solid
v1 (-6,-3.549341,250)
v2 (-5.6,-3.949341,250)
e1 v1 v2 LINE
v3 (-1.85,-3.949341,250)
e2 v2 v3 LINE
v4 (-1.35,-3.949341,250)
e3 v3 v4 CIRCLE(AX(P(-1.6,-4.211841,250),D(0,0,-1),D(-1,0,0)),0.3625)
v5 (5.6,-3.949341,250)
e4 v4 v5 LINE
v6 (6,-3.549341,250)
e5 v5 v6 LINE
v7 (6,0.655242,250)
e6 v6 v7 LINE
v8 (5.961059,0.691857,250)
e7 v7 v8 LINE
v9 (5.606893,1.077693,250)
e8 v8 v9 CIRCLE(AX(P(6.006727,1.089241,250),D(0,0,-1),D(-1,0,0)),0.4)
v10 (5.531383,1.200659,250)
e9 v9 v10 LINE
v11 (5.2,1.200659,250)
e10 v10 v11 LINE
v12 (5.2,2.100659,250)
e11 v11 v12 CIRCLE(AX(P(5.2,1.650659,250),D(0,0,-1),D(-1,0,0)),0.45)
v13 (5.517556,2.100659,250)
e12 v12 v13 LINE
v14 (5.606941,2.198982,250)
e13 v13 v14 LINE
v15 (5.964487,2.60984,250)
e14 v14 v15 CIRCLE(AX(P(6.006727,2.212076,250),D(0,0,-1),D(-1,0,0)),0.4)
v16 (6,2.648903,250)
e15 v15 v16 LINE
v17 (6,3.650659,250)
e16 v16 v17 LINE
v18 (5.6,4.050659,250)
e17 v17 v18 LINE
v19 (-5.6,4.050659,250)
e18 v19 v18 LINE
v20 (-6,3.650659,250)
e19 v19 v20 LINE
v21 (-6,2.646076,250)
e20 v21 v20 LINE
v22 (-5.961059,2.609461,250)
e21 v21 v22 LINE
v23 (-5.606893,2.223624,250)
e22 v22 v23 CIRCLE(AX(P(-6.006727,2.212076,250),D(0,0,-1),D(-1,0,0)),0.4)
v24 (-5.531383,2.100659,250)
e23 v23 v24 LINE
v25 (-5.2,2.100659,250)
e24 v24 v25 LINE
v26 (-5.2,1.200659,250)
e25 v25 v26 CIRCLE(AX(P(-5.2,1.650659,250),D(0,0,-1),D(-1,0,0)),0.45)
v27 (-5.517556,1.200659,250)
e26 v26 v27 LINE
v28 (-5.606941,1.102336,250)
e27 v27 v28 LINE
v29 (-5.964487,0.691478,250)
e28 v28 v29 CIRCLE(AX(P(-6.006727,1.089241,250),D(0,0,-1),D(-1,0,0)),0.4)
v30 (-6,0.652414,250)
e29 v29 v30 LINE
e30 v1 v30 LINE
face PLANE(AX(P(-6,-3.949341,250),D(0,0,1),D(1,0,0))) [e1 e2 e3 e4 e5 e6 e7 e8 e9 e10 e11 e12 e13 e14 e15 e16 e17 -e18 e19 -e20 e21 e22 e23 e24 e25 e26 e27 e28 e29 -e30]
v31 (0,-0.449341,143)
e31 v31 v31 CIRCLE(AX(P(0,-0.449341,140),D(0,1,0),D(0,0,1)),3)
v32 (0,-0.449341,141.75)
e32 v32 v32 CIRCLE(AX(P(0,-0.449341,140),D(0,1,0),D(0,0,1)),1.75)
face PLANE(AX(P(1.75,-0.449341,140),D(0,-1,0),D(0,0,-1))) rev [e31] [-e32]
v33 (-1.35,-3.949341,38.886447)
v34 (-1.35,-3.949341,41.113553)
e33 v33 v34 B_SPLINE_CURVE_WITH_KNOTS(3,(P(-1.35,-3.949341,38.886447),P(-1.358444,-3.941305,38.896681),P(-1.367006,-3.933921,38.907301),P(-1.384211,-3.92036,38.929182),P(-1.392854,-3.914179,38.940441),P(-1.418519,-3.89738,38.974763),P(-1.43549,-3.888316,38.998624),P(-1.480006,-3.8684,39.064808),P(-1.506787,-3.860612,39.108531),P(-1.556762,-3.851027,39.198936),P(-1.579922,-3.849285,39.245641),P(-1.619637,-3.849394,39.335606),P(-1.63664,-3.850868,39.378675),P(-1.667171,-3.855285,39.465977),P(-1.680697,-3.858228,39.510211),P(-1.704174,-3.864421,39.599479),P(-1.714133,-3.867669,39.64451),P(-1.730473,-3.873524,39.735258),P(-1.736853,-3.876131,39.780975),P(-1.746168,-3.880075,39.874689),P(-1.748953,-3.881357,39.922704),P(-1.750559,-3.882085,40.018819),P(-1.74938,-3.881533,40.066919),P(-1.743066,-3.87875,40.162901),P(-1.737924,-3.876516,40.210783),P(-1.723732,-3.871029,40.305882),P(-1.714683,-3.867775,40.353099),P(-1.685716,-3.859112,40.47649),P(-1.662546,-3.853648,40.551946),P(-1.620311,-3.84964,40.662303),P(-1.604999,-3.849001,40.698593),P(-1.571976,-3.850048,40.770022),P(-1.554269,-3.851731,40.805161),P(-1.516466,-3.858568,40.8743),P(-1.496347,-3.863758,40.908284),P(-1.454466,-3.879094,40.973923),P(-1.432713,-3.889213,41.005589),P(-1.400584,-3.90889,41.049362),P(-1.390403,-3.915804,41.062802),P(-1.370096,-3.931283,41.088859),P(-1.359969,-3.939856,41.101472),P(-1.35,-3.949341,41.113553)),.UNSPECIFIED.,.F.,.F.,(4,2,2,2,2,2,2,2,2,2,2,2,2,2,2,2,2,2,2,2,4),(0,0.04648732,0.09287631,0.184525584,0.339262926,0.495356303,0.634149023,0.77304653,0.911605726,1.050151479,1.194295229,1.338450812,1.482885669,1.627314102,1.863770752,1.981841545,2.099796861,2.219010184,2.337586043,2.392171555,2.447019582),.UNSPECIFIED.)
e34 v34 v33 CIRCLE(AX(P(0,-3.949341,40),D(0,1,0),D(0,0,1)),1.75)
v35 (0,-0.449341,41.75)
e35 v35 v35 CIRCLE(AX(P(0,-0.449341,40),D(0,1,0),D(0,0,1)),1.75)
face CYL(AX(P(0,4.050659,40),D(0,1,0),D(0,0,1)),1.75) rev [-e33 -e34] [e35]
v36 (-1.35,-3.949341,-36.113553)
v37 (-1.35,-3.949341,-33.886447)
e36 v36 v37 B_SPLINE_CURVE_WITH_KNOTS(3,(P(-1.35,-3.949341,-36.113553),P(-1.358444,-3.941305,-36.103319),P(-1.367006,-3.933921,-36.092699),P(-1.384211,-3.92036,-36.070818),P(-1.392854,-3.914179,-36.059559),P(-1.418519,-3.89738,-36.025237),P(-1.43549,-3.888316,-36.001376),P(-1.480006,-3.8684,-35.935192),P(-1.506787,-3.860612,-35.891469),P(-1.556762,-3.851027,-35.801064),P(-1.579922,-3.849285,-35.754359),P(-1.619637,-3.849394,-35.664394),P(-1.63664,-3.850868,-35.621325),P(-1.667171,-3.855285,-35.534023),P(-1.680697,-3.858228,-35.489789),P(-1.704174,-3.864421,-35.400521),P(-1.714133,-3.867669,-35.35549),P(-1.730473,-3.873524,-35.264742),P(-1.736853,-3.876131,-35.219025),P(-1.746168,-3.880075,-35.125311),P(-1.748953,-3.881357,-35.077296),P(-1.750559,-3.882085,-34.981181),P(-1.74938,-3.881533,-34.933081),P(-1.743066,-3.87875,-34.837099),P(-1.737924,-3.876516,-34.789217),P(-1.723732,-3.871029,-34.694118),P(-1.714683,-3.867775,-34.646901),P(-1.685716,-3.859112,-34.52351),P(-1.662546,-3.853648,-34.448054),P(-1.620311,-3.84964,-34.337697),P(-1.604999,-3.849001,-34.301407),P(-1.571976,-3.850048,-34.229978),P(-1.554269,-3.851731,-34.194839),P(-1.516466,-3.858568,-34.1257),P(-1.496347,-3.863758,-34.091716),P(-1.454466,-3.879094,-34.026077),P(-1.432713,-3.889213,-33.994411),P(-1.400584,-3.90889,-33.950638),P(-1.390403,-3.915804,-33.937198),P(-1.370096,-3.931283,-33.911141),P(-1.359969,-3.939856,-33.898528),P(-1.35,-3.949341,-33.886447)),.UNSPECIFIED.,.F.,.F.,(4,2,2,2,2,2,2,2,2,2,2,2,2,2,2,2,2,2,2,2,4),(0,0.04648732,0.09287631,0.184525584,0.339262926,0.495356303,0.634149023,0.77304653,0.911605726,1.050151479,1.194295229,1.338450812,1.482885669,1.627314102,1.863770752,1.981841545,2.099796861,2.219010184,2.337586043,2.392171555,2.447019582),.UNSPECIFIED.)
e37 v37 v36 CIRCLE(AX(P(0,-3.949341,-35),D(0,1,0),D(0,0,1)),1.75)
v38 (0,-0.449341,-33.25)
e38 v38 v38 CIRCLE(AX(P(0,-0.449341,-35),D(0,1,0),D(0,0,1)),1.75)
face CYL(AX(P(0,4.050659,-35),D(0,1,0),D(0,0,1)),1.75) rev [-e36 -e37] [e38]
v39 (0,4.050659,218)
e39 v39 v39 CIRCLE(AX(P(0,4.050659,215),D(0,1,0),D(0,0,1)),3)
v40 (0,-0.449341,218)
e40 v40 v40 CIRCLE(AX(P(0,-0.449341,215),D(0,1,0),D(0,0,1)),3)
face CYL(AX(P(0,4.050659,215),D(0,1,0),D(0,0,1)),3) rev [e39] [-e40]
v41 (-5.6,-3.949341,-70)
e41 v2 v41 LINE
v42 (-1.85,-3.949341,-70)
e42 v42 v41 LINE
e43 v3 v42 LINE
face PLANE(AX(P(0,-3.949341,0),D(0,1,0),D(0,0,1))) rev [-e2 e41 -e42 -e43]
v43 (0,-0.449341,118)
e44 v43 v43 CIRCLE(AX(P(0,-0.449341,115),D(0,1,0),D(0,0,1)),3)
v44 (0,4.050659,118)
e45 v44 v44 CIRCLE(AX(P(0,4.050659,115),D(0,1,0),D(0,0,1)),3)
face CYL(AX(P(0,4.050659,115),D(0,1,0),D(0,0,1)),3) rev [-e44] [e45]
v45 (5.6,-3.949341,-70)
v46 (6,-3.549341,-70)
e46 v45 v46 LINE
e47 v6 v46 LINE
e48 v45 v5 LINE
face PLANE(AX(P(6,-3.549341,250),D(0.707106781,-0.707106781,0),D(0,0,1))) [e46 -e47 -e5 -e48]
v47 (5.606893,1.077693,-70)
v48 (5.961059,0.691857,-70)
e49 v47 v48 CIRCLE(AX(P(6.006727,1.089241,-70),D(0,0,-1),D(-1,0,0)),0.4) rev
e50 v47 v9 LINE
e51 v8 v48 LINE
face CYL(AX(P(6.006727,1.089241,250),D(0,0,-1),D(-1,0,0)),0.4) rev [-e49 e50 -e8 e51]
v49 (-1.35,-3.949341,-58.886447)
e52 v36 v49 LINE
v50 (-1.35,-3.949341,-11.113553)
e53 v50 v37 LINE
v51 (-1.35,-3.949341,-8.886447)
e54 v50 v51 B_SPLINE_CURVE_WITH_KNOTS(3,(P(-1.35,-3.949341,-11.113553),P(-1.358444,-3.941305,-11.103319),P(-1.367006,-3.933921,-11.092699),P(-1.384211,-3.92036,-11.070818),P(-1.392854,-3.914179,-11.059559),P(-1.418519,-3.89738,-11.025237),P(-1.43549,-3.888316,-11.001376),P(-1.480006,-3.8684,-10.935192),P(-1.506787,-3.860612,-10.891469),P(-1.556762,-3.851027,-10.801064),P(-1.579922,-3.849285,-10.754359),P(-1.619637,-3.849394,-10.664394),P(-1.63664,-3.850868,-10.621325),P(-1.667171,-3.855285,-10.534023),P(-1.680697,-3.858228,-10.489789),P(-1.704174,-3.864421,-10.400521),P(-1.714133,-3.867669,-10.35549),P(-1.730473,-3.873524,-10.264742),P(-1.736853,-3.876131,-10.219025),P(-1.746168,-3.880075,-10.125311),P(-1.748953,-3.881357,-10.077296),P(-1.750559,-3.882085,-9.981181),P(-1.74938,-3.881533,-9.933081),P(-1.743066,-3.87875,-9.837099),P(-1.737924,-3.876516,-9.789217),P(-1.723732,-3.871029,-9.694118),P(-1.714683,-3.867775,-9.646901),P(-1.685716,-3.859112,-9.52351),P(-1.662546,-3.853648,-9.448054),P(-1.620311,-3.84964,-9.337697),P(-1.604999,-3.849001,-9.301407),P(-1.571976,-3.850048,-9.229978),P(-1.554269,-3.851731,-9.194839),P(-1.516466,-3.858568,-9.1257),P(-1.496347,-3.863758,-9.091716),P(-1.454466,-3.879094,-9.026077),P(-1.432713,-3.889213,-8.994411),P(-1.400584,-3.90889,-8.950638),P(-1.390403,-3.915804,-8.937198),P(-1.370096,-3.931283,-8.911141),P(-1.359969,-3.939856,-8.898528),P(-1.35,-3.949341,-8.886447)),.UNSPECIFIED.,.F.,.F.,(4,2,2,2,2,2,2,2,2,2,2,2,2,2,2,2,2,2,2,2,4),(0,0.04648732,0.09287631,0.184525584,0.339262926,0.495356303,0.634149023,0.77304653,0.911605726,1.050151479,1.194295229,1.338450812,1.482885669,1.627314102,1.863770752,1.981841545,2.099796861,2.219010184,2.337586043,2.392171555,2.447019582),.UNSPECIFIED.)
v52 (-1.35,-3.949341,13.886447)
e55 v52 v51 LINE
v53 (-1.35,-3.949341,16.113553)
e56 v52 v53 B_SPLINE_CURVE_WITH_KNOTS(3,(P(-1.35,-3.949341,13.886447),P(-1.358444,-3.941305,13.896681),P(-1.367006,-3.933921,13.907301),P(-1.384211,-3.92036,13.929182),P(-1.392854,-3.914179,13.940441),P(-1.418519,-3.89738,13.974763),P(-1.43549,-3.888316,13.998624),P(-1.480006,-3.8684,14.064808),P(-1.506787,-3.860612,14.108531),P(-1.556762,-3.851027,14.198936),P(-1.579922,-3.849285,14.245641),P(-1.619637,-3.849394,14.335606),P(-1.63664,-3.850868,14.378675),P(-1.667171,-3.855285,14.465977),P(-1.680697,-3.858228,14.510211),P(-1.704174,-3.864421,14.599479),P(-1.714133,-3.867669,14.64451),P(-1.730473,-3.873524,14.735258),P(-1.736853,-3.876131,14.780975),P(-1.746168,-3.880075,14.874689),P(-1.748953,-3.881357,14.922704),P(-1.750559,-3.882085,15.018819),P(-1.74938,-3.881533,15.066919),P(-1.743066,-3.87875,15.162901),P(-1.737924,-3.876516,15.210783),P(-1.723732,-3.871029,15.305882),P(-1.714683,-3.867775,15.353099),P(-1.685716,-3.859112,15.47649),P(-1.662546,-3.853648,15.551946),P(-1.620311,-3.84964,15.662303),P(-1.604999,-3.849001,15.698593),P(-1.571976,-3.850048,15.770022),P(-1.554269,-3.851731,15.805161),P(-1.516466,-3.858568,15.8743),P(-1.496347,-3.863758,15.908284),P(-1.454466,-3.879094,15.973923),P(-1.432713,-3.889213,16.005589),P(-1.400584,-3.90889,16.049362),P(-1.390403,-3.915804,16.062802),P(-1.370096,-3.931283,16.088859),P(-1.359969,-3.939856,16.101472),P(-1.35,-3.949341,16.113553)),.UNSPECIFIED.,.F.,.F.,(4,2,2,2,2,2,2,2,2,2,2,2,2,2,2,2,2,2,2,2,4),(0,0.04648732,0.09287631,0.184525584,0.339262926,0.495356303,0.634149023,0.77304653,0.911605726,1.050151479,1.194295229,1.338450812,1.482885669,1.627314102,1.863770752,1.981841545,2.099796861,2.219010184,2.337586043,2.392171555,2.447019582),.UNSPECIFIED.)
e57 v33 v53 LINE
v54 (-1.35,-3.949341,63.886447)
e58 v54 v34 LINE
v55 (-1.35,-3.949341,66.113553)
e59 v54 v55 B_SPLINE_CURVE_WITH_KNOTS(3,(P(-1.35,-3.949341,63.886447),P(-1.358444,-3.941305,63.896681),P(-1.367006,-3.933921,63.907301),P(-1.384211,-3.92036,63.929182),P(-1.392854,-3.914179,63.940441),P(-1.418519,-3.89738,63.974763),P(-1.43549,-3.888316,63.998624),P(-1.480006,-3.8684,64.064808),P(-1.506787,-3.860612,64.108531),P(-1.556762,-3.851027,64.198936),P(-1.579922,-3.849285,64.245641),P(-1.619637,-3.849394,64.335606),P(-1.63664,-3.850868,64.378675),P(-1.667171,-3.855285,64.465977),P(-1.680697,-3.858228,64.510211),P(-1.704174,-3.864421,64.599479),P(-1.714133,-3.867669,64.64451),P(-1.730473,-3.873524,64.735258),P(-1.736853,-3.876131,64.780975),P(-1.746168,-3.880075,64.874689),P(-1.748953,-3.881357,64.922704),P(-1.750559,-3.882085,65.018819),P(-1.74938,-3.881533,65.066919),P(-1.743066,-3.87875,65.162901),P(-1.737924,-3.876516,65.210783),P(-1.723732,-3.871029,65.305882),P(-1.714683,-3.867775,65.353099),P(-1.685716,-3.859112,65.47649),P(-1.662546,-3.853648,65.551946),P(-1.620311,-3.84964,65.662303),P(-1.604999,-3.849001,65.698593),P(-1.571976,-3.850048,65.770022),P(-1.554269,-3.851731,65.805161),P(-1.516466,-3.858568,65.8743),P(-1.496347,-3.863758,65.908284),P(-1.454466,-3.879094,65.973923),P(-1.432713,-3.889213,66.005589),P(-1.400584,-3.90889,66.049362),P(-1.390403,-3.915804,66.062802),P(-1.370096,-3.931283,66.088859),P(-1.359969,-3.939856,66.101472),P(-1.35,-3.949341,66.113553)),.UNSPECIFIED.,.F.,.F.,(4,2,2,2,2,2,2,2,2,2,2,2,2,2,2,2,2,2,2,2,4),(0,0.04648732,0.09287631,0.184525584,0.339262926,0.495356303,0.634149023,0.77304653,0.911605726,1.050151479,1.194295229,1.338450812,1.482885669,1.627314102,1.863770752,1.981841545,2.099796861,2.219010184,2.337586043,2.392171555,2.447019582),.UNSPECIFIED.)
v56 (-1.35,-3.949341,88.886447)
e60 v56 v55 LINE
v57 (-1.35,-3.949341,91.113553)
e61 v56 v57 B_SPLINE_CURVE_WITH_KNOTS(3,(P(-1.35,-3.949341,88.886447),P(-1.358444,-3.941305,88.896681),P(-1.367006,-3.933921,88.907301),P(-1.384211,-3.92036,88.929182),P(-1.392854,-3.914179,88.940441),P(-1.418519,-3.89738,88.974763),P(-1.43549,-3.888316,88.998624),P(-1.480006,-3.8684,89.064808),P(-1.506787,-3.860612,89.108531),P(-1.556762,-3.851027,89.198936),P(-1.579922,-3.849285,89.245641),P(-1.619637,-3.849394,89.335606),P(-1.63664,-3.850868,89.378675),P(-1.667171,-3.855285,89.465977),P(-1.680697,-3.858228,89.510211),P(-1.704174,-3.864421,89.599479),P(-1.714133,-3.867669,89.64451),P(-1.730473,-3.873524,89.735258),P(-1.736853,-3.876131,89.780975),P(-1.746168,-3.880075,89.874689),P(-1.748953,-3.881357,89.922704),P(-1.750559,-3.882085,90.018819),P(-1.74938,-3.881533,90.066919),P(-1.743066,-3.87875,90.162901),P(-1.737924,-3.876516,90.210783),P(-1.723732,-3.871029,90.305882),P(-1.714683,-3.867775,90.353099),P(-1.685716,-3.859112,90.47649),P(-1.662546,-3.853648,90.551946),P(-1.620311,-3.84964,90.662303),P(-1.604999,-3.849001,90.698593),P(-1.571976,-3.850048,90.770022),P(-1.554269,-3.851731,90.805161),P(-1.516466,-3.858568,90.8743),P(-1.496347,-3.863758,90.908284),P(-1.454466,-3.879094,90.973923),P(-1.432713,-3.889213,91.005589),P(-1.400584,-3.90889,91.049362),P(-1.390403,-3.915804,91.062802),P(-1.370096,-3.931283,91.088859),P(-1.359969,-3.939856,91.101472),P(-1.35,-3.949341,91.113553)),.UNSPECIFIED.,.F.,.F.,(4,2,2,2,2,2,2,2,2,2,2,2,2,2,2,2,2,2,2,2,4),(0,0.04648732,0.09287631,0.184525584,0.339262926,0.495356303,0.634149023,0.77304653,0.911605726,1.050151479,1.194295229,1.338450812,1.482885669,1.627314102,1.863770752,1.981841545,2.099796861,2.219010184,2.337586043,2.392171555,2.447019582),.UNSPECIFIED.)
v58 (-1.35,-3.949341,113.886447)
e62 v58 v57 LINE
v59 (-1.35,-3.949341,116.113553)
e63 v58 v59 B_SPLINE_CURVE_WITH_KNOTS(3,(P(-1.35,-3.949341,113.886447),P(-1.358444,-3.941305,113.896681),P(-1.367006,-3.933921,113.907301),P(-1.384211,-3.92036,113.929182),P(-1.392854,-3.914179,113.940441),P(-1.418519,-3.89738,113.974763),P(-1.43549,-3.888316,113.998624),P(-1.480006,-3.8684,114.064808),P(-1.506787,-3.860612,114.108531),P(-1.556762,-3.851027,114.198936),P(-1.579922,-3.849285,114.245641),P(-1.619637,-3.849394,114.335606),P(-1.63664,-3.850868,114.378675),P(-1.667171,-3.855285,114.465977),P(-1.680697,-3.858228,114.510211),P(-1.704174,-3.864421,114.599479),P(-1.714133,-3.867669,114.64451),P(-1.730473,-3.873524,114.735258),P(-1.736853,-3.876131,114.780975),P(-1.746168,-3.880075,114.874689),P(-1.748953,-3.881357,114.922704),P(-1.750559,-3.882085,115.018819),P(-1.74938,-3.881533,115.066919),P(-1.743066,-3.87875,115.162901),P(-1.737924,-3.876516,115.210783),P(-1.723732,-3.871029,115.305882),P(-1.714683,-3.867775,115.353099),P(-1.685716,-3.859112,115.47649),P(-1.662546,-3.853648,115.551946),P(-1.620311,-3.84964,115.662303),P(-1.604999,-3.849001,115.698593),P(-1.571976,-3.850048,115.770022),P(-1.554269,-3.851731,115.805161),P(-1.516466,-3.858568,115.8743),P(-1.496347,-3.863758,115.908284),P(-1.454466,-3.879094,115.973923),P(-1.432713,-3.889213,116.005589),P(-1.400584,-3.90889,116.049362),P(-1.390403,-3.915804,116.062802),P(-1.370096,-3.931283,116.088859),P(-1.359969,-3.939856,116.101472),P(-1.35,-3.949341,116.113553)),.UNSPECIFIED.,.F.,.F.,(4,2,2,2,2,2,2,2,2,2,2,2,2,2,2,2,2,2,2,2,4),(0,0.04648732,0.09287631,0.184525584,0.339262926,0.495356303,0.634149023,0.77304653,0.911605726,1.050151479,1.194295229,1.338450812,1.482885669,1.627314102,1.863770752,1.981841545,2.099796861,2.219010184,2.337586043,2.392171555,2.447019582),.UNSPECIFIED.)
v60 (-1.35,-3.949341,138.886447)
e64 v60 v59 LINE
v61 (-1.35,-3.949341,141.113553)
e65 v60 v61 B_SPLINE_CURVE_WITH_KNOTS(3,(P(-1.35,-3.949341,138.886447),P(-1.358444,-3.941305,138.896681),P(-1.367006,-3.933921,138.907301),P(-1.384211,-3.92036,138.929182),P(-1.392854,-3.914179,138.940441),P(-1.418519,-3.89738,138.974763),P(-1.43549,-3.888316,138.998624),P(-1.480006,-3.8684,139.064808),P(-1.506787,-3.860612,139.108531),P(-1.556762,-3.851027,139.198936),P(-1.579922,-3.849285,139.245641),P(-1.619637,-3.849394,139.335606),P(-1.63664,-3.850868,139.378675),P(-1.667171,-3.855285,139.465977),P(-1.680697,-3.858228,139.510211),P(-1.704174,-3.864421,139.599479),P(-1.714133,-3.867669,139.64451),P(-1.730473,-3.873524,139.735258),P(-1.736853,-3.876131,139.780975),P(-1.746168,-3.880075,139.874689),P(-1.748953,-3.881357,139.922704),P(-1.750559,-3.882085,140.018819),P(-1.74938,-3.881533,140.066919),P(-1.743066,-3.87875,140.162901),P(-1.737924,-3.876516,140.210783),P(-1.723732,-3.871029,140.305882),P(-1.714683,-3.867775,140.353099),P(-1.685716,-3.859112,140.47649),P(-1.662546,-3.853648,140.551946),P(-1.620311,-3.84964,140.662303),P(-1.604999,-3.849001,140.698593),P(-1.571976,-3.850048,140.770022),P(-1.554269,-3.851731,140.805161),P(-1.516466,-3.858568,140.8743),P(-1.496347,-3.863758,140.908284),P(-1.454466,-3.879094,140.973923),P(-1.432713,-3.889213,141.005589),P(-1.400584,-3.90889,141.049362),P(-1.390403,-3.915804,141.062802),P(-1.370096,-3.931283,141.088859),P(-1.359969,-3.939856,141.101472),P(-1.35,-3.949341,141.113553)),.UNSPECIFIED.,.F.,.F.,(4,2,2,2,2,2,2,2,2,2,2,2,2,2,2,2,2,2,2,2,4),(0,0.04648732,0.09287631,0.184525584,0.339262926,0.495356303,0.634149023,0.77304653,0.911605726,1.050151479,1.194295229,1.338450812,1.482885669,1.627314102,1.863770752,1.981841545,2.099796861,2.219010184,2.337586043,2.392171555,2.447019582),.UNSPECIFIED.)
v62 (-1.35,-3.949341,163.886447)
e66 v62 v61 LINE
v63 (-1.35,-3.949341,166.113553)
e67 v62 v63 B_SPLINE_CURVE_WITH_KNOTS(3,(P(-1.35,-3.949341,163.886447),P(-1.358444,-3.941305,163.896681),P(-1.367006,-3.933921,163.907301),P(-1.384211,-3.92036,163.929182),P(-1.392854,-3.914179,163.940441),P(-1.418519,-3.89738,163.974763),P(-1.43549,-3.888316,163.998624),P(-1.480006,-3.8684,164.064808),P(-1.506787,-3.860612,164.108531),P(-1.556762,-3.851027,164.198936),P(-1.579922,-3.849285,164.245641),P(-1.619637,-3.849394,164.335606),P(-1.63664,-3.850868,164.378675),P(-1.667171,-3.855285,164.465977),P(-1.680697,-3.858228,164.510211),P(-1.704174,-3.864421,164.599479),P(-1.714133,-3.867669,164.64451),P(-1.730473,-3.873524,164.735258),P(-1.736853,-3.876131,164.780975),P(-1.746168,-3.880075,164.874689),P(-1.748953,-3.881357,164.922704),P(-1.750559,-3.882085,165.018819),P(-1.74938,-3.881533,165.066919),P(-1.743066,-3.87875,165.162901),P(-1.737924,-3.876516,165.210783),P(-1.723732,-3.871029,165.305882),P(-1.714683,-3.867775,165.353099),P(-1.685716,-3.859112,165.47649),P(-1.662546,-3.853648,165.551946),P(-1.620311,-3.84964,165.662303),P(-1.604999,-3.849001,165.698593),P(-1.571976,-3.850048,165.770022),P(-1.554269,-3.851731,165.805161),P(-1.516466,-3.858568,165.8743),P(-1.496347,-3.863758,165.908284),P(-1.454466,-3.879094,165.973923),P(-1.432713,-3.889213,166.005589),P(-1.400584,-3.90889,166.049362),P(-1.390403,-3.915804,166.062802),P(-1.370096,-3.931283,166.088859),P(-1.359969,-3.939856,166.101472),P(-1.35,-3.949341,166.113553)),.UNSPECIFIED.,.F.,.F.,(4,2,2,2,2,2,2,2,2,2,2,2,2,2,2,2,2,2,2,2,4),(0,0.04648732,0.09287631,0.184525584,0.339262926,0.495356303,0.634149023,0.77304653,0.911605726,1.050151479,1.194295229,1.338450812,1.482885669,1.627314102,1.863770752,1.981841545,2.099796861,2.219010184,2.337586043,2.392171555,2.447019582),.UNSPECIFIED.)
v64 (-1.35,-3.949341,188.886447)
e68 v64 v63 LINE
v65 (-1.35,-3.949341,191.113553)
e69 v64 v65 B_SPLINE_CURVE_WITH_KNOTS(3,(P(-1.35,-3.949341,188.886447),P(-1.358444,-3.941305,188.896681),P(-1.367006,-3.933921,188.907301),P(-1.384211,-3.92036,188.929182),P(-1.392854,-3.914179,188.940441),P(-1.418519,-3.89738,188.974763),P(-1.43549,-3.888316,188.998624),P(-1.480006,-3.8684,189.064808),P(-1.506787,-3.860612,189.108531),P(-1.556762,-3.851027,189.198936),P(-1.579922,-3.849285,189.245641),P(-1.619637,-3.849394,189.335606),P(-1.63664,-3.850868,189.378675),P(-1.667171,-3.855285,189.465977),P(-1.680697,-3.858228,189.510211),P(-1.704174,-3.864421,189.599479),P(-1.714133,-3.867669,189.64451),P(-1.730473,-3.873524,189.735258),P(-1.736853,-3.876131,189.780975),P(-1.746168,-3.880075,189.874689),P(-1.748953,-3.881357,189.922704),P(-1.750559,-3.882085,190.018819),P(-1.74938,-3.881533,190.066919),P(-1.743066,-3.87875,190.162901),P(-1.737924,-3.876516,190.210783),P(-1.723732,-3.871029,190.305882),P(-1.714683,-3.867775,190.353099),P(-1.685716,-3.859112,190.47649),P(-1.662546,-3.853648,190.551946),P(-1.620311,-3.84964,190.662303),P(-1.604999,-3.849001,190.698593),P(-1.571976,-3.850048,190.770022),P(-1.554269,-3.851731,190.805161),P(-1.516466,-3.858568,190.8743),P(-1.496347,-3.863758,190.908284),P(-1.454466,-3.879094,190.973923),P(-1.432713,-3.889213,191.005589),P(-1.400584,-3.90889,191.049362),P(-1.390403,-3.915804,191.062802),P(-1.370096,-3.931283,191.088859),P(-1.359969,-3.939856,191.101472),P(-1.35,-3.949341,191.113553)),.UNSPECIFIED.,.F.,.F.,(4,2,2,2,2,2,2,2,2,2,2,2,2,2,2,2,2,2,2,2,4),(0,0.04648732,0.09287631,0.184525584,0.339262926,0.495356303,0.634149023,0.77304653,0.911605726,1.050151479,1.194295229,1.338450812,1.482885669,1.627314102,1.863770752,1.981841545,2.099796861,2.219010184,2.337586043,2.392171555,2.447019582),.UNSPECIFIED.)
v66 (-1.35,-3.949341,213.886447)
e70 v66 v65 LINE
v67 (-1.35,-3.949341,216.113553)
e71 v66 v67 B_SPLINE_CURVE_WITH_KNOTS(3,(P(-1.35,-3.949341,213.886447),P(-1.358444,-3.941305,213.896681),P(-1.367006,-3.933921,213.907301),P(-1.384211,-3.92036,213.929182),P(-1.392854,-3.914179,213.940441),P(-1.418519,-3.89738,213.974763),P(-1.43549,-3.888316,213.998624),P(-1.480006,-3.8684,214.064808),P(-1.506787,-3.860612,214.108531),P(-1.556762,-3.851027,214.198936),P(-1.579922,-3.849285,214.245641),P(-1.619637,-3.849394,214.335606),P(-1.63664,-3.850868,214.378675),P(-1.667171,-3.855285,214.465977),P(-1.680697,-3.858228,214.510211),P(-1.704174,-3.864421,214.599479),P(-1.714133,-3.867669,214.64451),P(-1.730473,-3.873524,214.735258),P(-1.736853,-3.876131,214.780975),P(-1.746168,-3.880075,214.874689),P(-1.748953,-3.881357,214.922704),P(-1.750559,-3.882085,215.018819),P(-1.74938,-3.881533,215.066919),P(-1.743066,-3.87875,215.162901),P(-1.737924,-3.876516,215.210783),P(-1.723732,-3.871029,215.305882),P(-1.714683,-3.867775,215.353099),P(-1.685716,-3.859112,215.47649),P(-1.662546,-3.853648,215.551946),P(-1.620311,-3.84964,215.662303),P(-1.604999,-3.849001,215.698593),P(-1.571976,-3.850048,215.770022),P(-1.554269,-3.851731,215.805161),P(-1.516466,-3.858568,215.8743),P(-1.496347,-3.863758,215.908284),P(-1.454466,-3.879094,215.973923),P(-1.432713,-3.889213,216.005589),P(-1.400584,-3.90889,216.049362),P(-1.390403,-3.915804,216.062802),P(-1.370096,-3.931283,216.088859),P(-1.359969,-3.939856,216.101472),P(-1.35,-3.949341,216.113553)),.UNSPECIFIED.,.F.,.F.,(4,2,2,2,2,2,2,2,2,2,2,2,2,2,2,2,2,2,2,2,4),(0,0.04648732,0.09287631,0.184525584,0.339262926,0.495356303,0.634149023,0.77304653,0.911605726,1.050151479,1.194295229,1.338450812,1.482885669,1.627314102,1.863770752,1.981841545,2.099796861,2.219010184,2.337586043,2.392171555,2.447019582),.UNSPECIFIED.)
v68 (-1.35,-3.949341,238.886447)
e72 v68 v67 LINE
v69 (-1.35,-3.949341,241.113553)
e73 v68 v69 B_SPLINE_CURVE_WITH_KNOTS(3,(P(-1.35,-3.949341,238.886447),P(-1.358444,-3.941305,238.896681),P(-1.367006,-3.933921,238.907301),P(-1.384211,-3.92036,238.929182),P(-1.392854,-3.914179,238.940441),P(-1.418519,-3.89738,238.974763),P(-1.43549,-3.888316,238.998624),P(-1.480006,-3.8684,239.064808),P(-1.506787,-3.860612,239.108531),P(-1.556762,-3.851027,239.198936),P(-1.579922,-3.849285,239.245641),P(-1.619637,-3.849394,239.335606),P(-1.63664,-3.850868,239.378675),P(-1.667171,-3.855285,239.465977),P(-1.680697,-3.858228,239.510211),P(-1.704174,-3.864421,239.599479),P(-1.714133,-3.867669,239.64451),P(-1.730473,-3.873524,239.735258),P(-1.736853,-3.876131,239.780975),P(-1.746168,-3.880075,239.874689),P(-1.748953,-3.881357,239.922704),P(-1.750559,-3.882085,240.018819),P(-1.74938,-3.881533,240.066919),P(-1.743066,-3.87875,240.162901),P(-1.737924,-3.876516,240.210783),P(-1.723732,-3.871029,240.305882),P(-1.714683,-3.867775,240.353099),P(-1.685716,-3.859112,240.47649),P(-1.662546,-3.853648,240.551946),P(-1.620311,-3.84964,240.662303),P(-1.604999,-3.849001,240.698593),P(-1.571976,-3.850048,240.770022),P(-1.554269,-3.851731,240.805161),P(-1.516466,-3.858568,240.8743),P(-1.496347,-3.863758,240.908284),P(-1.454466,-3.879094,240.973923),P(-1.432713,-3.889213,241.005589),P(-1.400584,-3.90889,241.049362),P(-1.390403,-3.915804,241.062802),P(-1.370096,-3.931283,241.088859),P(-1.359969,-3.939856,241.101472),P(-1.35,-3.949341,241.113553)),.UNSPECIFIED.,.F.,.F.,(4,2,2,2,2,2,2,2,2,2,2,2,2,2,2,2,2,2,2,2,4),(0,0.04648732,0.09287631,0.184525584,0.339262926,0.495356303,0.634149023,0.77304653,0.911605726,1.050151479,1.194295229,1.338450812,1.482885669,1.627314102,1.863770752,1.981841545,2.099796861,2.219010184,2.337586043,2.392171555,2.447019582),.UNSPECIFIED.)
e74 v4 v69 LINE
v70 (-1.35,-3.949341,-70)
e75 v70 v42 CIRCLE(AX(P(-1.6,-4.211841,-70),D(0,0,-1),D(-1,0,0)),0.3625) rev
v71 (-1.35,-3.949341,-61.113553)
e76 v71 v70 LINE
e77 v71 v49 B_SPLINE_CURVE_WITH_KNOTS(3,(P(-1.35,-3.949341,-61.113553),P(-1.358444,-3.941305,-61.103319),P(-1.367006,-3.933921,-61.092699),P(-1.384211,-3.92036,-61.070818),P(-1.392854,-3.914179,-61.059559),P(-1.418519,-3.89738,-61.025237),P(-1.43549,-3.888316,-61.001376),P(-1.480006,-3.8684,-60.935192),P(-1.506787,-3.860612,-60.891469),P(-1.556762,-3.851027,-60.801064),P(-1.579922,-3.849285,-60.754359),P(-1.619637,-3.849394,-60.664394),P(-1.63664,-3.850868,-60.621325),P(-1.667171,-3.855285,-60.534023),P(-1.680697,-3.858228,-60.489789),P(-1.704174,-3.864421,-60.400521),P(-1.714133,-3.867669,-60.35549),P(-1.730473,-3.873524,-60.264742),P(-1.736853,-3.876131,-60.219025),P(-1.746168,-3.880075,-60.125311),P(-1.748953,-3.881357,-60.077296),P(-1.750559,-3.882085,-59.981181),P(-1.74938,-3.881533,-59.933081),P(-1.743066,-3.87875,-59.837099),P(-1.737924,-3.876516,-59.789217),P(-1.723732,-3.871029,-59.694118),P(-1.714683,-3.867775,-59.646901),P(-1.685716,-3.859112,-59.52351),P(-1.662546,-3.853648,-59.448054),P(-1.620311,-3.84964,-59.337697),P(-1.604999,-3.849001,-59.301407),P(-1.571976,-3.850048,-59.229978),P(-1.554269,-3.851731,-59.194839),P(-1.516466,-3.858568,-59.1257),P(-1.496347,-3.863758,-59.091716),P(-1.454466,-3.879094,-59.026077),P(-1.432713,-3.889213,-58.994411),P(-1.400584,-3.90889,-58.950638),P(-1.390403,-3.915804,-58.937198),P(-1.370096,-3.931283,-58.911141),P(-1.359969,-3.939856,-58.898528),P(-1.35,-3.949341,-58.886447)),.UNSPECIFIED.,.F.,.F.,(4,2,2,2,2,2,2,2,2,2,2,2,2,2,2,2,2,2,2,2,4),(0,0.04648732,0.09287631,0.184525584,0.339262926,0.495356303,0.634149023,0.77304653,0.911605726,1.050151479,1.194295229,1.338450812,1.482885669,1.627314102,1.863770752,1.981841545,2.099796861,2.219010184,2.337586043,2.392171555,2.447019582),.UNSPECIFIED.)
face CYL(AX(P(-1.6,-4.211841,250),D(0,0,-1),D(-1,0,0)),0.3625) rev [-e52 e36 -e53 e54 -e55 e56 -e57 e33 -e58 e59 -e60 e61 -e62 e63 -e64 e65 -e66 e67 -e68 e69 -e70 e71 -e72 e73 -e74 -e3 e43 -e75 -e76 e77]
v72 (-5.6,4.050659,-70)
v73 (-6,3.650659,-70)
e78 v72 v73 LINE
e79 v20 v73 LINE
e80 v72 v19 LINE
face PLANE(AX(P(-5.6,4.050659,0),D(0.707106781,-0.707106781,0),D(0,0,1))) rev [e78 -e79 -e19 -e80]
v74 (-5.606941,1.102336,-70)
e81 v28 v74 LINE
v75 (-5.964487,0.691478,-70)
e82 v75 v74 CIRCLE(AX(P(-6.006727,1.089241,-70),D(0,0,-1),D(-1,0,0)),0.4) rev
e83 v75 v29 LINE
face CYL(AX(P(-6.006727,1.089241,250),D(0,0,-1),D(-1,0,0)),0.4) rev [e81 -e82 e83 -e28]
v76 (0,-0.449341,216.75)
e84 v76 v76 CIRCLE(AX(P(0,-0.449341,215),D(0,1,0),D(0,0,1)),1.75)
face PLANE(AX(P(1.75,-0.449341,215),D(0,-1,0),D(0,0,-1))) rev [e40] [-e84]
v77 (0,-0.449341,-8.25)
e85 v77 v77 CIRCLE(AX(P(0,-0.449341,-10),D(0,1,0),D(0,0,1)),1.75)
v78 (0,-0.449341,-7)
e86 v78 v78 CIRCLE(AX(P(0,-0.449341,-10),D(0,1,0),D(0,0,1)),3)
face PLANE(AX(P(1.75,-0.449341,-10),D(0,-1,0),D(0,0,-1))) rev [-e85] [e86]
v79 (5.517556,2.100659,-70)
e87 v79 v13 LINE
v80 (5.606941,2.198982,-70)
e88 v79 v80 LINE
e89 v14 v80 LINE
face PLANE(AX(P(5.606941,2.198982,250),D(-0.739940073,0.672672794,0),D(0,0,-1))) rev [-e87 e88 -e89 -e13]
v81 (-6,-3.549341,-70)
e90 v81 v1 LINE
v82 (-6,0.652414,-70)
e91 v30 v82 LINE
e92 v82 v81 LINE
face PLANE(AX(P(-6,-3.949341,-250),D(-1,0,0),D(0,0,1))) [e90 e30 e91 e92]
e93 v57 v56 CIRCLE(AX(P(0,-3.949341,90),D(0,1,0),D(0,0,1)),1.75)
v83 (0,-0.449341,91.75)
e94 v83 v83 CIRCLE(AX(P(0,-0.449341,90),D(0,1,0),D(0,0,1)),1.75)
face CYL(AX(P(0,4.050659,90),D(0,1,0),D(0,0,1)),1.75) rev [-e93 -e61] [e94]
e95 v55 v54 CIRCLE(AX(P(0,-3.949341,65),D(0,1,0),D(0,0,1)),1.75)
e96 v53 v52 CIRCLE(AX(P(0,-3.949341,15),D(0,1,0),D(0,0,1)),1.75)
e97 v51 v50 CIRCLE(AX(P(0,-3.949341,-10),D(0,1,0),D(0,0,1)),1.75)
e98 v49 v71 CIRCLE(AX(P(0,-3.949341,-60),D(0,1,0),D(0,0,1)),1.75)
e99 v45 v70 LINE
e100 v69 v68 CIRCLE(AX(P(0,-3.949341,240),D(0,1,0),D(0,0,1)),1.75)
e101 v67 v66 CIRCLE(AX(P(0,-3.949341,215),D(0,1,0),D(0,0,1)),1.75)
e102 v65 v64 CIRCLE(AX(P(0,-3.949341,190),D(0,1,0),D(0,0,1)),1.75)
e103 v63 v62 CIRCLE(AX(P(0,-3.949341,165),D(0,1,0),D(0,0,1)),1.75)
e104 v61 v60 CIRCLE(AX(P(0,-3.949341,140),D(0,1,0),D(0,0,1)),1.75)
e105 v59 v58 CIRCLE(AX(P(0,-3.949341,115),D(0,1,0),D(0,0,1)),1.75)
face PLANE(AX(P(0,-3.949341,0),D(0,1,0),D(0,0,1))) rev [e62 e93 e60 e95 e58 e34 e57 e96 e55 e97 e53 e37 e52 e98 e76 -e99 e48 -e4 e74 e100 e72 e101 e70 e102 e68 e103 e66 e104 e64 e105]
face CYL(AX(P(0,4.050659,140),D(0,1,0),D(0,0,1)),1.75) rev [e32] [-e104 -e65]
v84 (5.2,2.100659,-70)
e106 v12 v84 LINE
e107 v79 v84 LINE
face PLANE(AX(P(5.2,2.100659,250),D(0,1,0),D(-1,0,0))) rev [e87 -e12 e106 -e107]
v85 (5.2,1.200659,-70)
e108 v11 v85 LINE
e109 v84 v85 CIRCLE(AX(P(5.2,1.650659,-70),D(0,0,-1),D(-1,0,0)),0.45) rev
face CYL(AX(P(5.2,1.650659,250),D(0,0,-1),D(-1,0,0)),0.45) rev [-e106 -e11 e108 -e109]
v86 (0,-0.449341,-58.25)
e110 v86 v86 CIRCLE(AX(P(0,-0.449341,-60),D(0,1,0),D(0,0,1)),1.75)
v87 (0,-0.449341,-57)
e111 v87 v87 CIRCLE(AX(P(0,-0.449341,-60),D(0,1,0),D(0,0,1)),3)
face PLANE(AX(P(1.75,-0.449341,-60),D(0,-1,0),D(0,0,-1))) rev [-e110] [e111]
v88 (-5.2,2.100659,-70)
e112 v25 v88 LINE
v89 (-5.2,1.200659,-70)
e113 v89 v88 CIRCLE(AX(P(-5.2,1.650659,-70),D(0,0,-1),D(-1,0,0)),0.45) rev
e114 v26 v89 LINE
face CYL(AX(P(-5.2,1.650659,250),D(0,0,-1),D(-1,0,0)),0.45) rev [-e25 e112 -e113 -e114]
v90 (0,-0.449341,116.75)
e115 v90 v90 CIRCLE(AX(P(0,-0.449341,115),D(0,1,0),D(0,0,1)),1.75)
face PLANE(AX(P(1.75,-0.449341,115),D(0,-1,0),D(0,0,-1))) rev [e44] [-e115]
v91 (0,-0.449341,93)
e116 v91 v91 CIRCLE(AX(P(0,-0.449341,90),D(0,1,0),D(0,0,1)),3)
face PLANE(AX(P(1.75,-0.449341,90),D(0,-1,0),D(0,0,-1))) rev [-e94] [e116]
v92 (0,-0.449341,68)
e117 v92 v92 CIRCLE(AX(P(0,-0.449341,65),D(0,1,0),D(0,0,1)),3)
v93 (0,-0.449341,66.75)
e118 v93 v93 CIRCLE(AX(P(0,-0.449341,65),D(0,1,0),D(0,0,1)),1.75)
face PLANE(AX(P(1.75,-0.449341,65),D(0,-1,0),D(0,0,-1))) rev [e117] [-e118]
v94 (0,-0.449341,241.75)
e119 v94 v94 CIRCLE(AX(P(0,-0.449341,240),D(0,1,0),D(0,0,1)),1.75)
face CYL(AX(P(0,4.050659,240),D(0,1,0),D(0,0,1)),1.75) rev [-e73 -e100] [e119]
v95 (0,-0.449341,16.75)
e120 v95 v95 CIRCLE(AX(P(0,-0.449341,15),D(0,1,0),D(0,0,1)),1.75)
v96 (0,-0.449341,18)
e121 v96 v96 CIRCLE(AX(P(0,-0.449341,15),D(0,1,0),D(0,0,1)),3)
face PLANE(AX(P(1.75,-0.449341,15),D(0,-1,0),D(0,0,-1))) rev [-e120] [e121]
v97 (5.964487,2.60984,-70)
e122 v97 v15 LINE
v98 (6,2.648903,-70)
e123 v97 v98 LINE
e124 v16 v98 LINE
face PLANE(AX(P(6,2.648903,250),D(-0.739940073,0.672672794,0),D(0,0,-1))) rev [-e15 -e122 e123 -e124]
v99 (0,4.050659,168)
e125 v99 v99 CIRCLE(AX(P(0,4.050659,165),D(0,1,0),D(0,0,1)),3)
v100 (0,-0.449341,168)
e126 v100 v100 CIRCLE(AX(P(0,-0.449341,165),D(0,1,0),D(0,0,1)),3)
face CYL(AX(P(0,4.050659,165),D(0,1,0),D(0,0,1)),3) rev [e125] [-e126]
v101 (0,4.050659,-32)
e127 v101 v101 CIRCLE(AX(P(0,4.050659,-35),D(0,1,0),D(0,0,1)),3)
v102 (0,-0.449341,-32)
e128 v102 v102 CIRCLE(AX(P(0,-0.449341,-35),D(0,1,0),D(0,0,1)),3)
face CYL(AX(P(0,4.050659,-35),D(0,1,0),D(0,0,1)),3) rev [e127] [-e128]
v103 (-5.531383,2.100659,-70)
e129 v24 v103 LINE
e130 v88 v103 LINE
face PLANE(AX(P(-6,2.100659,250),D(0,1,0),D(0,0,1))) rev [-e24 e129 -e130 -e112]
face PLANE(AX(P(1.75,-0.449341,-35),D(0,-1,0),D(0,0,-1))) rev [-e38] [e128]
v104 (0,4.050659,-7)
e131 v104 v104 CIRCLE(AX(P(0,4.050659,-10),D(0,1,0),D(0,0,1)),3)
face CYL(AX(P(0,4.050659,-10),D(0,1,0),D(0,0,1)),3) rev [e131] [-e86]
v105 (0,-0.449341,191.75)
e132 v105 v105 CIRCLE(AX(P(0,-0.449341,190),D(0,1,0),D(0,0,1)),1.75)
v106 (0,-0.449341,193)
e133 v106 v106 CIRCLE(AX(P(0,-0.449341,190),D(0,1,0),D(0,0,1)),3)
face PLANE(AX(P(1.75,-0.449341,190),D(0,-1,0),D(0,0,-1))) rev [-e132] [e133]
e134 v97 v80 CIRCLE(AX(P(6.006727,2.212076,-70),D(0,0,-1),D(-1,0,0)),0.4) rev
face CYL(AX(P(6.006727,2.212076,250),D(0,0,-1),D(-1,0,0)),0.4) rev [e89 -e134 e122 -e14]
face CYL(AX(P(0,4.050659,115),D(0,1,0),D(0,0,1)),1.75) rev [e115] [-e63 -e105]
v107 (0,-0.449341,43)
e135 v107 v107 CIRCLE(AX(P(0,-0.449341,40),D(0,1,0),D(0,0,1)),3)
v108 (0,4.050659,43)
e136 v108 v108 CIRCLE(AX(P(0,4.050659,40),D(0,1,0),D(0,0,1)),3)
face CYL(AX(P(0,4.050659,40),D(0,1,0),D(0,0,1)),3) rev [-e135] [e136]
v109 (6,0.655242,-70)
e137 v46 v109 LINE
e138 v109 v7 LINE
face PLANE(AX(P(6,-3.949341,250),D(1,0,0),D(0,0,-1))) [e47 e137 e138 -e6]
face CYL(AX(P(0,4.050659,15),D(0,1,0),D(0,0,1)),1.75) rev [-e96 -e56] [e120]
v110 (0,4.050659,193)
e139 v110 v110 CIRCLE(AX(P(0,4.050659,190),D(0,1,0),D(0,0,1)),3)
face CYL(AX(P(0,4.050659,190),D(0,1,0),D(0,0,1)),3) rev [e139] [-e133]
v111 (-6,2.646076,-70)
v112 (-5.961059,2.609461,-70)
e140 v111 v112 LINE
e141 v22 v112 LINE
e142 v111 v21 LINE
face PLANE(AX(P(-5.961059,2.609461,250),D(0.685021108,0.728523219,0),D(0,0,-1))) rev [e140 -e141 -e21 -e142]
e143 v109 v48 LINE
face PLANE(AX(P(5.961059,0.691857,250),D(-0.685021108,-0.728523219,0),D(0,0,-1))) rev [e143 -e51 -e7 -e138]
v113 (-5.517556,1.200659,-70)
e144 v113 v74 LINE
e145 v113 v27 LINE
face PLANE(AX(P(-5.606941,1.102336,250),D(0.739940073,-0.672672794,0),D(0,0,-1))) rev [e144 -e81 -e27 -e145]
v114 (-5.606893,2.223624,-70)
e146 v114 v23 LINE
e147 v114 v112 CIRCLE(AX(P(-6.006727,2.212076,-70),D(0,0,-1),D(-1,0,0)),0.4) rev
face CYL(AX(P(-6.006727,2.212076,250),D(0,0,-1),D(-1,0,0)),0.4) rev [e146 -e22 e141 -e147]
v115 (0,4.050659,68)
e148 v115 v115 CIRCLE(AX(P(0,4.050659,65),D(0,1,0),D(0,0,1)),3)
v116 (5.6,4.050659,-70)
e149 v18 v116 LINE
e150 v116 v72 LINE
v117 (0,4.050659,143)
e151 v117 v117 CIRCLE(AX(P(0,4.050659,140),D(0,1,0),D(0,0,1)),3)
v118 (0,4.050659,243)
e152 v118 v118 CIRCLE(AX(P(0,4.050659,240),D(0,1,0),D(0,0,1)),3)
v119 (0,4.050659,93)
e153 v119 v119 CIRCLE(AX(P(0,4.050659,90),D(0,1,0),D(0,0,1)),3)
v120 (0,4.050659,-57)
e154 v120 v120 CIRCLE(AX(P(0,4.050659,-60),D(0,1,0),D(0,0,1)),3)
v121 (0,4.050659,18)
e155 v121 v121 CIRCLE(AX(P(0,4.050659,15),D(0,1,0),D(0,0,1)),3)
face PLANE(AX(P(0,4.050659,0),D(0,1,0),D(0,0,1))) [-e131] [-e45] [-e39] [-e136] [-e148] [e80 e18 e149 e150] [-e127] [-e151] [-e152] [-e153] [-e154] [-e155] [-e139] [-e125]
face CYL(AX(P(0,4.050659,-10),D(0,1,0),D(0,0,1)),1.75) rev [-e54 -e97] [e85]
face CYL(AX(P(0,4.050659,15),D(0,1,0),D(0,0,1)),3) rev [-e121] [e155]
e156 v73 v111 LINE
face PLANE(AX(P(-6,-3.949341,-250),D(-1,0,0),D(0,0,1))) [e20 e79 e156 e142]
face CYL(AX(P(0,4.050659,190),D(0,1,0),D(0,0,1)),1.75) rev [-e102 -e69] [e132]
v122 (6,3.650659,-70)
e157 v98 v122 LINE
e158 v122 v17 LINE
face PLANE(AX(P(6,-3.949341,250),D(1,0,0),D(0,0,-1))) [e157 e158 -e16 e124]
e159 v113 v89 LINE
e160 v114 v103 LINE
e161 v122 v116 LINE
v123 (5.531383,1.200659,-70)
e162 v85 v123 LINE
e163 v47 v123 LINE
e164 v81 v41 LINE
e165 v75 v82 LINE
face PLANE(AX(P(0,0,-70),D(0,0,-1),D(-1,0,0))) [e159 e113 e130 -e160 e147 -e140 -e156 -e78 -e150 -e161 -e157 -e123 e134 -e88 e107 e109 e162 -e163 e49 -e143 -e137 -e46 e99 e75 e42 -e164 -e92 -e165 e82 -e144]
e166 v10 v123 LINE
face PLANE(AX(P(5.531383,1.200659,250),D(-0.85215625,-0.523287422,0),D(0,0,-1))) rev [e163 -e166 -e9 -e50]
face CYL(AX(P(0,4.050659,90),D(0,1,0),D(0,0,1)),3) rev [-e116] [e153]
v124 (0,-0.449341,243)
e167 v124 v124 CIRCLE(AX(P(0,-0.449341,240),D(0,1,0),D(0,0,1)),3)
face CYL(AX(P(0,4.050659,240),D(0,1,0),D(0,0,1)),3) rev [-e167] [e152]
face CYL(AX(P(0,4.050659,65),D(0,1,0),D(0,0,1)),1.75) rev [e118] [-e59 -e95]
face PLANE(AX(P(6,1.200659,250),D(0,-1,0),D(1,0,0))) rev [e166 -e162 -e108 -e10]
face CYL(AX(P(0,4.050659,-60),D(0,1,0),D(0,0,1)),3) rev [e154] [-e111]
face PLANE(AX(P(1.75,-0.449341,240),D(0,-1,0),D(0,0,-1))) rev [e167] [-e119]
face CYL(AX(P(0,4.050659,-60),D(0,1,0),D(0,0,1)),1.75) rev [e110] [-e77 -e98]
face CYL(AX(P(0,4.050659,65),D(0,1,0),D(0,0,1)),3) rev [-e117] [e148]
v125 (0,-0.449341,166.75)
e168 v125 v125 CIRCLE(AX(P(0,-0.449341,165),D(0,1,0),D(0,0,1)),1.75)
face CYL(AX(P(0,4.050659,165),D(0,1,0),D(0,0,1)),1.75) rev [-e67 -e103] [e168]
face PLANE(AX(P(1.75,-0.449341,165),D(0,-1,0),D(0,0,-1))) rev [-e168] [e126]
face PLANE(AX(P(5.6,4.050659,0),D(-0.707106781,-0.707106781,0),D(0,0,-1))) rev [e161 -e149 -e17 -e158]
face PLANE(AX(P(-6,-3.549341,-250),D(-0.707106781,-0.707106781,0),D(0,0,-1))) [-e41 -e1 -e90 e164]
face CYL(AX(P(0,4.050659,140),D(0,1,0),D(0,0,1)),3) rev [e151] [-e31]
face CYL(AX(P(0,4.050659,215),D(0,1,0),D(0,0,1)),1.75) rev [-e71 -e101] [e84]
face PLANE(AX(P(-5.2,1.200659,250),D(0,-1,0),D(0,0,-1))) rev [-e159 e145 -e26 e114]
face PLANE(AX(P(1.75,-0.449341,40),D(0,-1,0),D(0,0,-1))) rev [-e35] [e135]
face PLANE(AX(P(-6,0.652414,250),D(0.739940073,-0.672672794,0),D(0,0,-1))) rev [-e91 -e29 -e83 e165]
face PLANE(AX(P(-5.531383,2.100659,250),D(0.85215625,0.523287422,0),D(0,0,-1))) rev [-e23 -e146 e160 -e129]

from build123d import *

# Parameters (mm, degrees)
CROQUIS1_W                                           = 12
CROQUIS1_H                                           = 500
SALIENTE_EXTRUIR1_DEPTH                              = 8
CORTAR_EXTRUIR1_DEPTH                                = 501.05240509
CORTAR_EXTRUIR2_DEPTH                                = 501.05240509
CORTAR_EXTRUIR3_DEPTH                                = 501.05240509
CORTAR_EXTRUIR4_DEPTH                                = 501.05240509
CORTAR_EXTRUIR5_DEPTH                                = 501.05240509
CORTAR_EXTRUIR6_DEPTH                                = 501.05240509
CORTAR_EXTRUIR7_DEPTH                                = 501.05240509
REFRENTADO_PARA_TORNILLO_CON_CABEZA_HEXA_D           = 3.5
REFRENTADO_PARA_TORNILLO_CON_CABEZA_HEXA_CBORE_D     = 6
REFRENTADO_PARA_TORNILLO_CON_CABEZA_HEXA_CBORE_DEPTH = 4.5
CHAFL_N1_SIZE                                        = 0.4
CHAFL_N2_SIZE                                        = 0.034056407
CHAFL_N2_SIZE_2                                      = 0.03688403
CHAFL_N3_SIZE                                        = 0.091173812
CHAFL_N3_SIZE_2                                      = 0.105000846
CROQUIS11_W                                          = 21.39366532
CROQUIS11_H                                          = 19.512682309
CORTAR_EXTRUIR8_DEPTH                                = 180


with BuildPart() as part:
    # Croquis1 → Saliente-Extruir1 (new body)
    with BuildSketch(Plane(origin=(0, 4.050658692, 0), x_dir=(1, 0, 0), z_dir=(0, 1, 0))):
        Rectangle(CROQUIS1_W, CROQUIS1_H)
    extrude(amount=-SALIENTE_EXTRUIR1_DEPTH)

    # Croquis2 → Cortar-Extruir1 (cut, through all)
    with BuildSketch(Plane(origin=(0, 0, -250), x_dir=(-1, 0, 0), z_dir=(0, 0, -1))):
        with BuildLine():
            Line((1.35, -3.949341308), (1.85, -3.949341308))
            ThreePointArc((1.85, -3.949341308), (1.6, -3.849341308), (1.35, -3.949341308))
        make_face()
    extrude(amount=-CORTAR_EXTRUIR1_DEPTH, mode=Mode.SUBTRACT)

    # Croquis3 → Cortar-Extruir2 (cut, through all)
    with BuildSketch(Plane(origin=(0, 0, -250), x_dir=(-1, 0, 0), z_dir=(0, 0, -1))):
        with BuildLine():
            Line((-6, 2.100658692), (-6, 1.200658692))
            Line((-6, 1.200658692), (-5.2, 1.200658692))
            ThreePointArc((-5.2, 1.200658692), (-4.75, 1.650658692), (-5.2, 2.100658692))
            Line((-5.2, 2.100658692), (-6, 2.100658692))
        make_face()
    extrude(amount=-CORTAR_EXTRUIR2_DEPTH, mode=Mode.SUBTRACT)

    # Croquis4 → Cortar-Extruir3 (cut, through all)
    with BuildSketch(Plane(origin=(0, 0, -250), x_dir=(-1, 0, 0), z_dir=(0, 0, -1))):
        with BuildLine():
            Line((-5.622557264, 1.200658692), (-6, 1.200658692))
            Line((-6, 1.200658692), (-6, 0.689297919))
            ThreePointArc((-6, 0.689297919), (-5.684900038, 0.851696449), (-5.622557264, 1.200658692))
        make_face()
    extrude(amount=-CORTAR_EXTRUIR3_DEPTH, mode=Mode.SUBTRACT)

    # Croquis5 → Cortar-Extruir4 (cut, through all)
    with BuildSketch(Plane(origin=(0, 0, -250), x_dir=(-1, 0, 0), z_dir=(0, 0, -1))):
        with BuildLine():
            Line((-6, 2.612019466), (-6, 2.100658692))
            Line((-6, 2.100658692), (-5.622557264, 2.100658692))
            ThreePointArc((-5.622557264, 2.100658692), (-5.684900038, 2.449620935), (-6, 2.612019466))
        make_face()
    extrude(amount=-CORTAR_EXTRUIR4_DEPTH, mode=Mode.SUBTRACT)

    # Croquis6 → Cortar-Extruir5 (cut, through all)
    with BuildSketch(Plane(origin=(0, 0, -250), x_dir=(-1, 0, 0), z_dir=(0, 0, -1))):
        with BuildLine():
            Line((6, 1.200658692), (6, 2.100658692))
            Line((6, 2.100658692), (5.2, 2.100658692))
            ThreePointArc((5.2, 2.100658692), (4.75, 1.650658692), (5.2, 1.200658692))
            Line((5.2, 1.200658692), (6, 1.200658692))
        make_face()
    extrude(amount=-CORTAR_EXTRUIR5_DEPTH, mode=Mode.SUBTRACT)

    # Croquis7 → Cortar-Extruir6 (cut, through all)
    with BuildSketch(Plane(origin=(0, 0, -250), x_dir=(-1, 0, 0), z_dir=(0, 0, -1))):
        with BuildLine():
            Line((5.622557264, 2.100658692), (6, 2.100658692))
            Line((6, 2.100658692), (6, 2.612019466))
            ThreePointArc((6, 2.612019466), (5.684900038, 2.449620935), (5.622557264, 2.100658692))
        make_face()
    extrude(amount=-CORTAR_EXTRUIR6_DEPTH, mode=Mode.SUBTRACT)

    # Croquis8 → Cortar-Extruir7 (cut, through all)
    with BuildSketch(Plane(origin=(0, 0, -250), x_dir=(-1, 0, 0), z_dir=(0, 0, -1))):
        with BuildLine():
            Line((6, 0.689297919), (6, 1.200658692))
            Line((6, 1.200658692), (5.622557264, 1.200658692))
            ThreePointArc((5.622557264, 1.200658692), (5.684900038, 0.851696449), (6, 0.689297919))
        make_face()
    extrude(amount=-CORTAR_EXTRUIR7_DEPTH, mode=Mode.SUBTRACT)

    # Refrentado para tornillo con cabeza hexagonal de M31 (through all)
    with Locations(Plane(origin=(0, 4.050658692, 0), x_dir=(1, 0, 0), z_dir=(0, 1, 0))):
        with Locations((0, -240), (0, -215), (0, -190), (0, -165), (0, -140), (0, -115), (0, -90), (0, -65), (0, -40), (0, -15), (0, 10), (0, 35), (0, 60), (0, 85), (0, 110), (0, 135), (0, 160), (0, 185), (0, 210), (0, 235)):
            CounterBoreHole(REFRENTADO_PARA_TORNILLO_CON_CABEZA_HEXA_D / 2, REFRENTADO_PARA_TORNILLO_CON_CABEZA_HEXA_CBORE_D / 2, REFRENTADO_PARA_TORNILLO_CON_CABEZA_HEXA_CBORE_DEPTH)

    # Chaflán1
    chafl_n1_edges = [part.edges().sort_by_distance(p)[0] for p in [
        (-6, -3.949341308, 0),
        (6, -3.949341308, 0),
        (-6, 4.050658692, 0),
        (6, 4.050658692, 0),
    ]]
    chamfer(chafl_n1_edges, length=CHAFL_N1_SIZE)

    # Chaflán2
    # the kernel refuses this chamfer: 0.03688403, 0.034056407 mm, written as the material it takes off along each edge
    with BuildSketch(Plane(origin=(6, 0.689297919, -250.100435582), x_dir=(-0.9978479381588691, 0.06557051404475742, 0), z_dir=(0, 0, 1))) as chafl_n2_piece_1:
        with BuildLine():
            Line((0.03902449, 0), (-CHAFL_N2_SIZE * 0.0655705141026, CHAFL_N2_SIZE * 0.997847939043))
            Line((-CHAFL_N2_SIZE * 0.0655705141026, CHAFL_N2_SIZE * 0.997847939043), (0, 0))
            ThreePointArc((0, 0), (0.020082989, 0.000475786), (0.03902449, 0))
        make_face()
    extrude(amount=500.200871164, mode=Mode.SUBTRACT)
    with BuildSketch(Plane(origin=(6, 2.612019466, -250.094971685), x_dir=(0, 1, 0), z_dir=(0, 0, 1))) as chafl_n2_piece_2:
        with BuildLine():
            Line((CHAFL_N2_SIZE_2 * 0.999999990825, 0), (-0.002179894, 0.035512658))
            ThreePointArc((-0.002179894, 0.035512658), (-0.000727719, 0.018309495), (0, 0))
            Line((0, 0), (CHAFL_N2_SIZE_2 * 0.999999990825, 0))
        make_face()
    extrude(amount=500.189943371, mode=Mode.SUBTRACT)
    with BuildSketch(Plane(origin=(-6, 2.612019466, -250.100435582), x_dir=(0, 1, 0), z_dir=(0, 0, 1))) as chafl_n2_piece_3:
        with BuildLine():
            Line((CHAFL_N2_SIZE, 0), (-0.002558856, -0.038940507))
            ThreePointArc((-0.002558856, -0.038940507), (-0.00084209, -0.020070966), (0, 0))
            Line((0, 0), (CHAFL_N2_SIZE, 0))
        make_face()
    extrude(amount=500.200871164, mode=Mode.SUBTRACT)
    with BuildSketch(Plane(origin=(-6, 0.689297919, -250.094971685), x_dir=(0.9981213351064977, 0.061268265890444186, 0), z_dir=(0, 0, 1))) as chafl_n2_piece_4:
        with BuildLine():
            Line((0.0355795, 0), (-CHAFL_N2_SIZE_2 * 0.0612682653281, -CHAFL_N2_SIZE_2 * 0.998121325949))
            Line((-CHAFL_N2_SIZE_2 * 0.0612682653281, -CHAFL_N2_SIZE_2 * 0.998121325949), (0, 0))
            ThreePointArc((0, 0), (0.018319684, -0.000395439), (0.0355795, 0))
        make_face()
    extrude(amount=500.189943371, mode=Mode.SUBTRACT)

    # Chaflán3
    # the kernel refuses this chamfer: 0.105000846, 0.091173812 mm, written as the material it takes off along each edge
    with BuildSketch(Plane(origin=(5.622557264, 1.200658692, -250.318147751), x_dir=(-0.1263625484615496, -0.991984126055605, 0), z_dir=(0, 0, 1)), Plane(origin=(-5.622557264, 2.100658692, -250.318147751), x_dir=(0.12636254846156672, 0.9919841260556028, 0), z_dir=(0, 0, 1))) as chafl_n3_piece_1:
        with BuildLine():
            Line((0.123959197, 0), (CHAFL_N3_SIZE * 0.126362548546, -CHAFL_N3_SIZE * 0.99198412672))
            Line((CHAFL_N3_SIZE * 0.126362548546, -CHAFL_N3_SIZE * 0.99198412672), (0, 0))
            ThreePointArc((0, 0), (0.063641461, -0.004827559), (0.123959197, 0))
        make_face()
    extrude(amount=500.636295502, mode=Mode.SUBTRACT)
    with BuildSketch(Plane(origin=(5.622557264, 2.100658692, -250.269677179), x_dir=(-1, 0, 0), z_dir=(0, 0, 1)), Plane(origin=(-5.622557264, 1.200658692, -250.269677179), x_dir=(1, 0, 0), z_dir=(0, 0, 1))) as chafl_n3_piece_2:
        with BuildLine():
            Line((CHAFL_N3_SIZE_2, 0), (0.015616157, -0.098323158))
            ThreePointArc((0.015616157, -0.098323158), (0.011085216, -0.04998658), (0, 0))
            Line((0, 0), (CHAFL_N3_SIZE_2, 0))
        make_face()
    extrude(amount=500.539354358, mode=Mode.SUBTRACT)

    # Croquis11 → Cortar-Extruir8 (cut)
    with BuildSketch(Plane(origin=(0, 0, -250), x_dir=(-1, 0, 0), z_dir=(0, 0, -1))):
        with Locations((-0.979177693, 1.955889883)):
            Rectangle(CROQUIS11_W, CROQUIS11_H)
    extrude(amount=-CORTAR_EXTRUIR8_DEPTH, mode=Mode.SUBTRACT)


solid = part.part
